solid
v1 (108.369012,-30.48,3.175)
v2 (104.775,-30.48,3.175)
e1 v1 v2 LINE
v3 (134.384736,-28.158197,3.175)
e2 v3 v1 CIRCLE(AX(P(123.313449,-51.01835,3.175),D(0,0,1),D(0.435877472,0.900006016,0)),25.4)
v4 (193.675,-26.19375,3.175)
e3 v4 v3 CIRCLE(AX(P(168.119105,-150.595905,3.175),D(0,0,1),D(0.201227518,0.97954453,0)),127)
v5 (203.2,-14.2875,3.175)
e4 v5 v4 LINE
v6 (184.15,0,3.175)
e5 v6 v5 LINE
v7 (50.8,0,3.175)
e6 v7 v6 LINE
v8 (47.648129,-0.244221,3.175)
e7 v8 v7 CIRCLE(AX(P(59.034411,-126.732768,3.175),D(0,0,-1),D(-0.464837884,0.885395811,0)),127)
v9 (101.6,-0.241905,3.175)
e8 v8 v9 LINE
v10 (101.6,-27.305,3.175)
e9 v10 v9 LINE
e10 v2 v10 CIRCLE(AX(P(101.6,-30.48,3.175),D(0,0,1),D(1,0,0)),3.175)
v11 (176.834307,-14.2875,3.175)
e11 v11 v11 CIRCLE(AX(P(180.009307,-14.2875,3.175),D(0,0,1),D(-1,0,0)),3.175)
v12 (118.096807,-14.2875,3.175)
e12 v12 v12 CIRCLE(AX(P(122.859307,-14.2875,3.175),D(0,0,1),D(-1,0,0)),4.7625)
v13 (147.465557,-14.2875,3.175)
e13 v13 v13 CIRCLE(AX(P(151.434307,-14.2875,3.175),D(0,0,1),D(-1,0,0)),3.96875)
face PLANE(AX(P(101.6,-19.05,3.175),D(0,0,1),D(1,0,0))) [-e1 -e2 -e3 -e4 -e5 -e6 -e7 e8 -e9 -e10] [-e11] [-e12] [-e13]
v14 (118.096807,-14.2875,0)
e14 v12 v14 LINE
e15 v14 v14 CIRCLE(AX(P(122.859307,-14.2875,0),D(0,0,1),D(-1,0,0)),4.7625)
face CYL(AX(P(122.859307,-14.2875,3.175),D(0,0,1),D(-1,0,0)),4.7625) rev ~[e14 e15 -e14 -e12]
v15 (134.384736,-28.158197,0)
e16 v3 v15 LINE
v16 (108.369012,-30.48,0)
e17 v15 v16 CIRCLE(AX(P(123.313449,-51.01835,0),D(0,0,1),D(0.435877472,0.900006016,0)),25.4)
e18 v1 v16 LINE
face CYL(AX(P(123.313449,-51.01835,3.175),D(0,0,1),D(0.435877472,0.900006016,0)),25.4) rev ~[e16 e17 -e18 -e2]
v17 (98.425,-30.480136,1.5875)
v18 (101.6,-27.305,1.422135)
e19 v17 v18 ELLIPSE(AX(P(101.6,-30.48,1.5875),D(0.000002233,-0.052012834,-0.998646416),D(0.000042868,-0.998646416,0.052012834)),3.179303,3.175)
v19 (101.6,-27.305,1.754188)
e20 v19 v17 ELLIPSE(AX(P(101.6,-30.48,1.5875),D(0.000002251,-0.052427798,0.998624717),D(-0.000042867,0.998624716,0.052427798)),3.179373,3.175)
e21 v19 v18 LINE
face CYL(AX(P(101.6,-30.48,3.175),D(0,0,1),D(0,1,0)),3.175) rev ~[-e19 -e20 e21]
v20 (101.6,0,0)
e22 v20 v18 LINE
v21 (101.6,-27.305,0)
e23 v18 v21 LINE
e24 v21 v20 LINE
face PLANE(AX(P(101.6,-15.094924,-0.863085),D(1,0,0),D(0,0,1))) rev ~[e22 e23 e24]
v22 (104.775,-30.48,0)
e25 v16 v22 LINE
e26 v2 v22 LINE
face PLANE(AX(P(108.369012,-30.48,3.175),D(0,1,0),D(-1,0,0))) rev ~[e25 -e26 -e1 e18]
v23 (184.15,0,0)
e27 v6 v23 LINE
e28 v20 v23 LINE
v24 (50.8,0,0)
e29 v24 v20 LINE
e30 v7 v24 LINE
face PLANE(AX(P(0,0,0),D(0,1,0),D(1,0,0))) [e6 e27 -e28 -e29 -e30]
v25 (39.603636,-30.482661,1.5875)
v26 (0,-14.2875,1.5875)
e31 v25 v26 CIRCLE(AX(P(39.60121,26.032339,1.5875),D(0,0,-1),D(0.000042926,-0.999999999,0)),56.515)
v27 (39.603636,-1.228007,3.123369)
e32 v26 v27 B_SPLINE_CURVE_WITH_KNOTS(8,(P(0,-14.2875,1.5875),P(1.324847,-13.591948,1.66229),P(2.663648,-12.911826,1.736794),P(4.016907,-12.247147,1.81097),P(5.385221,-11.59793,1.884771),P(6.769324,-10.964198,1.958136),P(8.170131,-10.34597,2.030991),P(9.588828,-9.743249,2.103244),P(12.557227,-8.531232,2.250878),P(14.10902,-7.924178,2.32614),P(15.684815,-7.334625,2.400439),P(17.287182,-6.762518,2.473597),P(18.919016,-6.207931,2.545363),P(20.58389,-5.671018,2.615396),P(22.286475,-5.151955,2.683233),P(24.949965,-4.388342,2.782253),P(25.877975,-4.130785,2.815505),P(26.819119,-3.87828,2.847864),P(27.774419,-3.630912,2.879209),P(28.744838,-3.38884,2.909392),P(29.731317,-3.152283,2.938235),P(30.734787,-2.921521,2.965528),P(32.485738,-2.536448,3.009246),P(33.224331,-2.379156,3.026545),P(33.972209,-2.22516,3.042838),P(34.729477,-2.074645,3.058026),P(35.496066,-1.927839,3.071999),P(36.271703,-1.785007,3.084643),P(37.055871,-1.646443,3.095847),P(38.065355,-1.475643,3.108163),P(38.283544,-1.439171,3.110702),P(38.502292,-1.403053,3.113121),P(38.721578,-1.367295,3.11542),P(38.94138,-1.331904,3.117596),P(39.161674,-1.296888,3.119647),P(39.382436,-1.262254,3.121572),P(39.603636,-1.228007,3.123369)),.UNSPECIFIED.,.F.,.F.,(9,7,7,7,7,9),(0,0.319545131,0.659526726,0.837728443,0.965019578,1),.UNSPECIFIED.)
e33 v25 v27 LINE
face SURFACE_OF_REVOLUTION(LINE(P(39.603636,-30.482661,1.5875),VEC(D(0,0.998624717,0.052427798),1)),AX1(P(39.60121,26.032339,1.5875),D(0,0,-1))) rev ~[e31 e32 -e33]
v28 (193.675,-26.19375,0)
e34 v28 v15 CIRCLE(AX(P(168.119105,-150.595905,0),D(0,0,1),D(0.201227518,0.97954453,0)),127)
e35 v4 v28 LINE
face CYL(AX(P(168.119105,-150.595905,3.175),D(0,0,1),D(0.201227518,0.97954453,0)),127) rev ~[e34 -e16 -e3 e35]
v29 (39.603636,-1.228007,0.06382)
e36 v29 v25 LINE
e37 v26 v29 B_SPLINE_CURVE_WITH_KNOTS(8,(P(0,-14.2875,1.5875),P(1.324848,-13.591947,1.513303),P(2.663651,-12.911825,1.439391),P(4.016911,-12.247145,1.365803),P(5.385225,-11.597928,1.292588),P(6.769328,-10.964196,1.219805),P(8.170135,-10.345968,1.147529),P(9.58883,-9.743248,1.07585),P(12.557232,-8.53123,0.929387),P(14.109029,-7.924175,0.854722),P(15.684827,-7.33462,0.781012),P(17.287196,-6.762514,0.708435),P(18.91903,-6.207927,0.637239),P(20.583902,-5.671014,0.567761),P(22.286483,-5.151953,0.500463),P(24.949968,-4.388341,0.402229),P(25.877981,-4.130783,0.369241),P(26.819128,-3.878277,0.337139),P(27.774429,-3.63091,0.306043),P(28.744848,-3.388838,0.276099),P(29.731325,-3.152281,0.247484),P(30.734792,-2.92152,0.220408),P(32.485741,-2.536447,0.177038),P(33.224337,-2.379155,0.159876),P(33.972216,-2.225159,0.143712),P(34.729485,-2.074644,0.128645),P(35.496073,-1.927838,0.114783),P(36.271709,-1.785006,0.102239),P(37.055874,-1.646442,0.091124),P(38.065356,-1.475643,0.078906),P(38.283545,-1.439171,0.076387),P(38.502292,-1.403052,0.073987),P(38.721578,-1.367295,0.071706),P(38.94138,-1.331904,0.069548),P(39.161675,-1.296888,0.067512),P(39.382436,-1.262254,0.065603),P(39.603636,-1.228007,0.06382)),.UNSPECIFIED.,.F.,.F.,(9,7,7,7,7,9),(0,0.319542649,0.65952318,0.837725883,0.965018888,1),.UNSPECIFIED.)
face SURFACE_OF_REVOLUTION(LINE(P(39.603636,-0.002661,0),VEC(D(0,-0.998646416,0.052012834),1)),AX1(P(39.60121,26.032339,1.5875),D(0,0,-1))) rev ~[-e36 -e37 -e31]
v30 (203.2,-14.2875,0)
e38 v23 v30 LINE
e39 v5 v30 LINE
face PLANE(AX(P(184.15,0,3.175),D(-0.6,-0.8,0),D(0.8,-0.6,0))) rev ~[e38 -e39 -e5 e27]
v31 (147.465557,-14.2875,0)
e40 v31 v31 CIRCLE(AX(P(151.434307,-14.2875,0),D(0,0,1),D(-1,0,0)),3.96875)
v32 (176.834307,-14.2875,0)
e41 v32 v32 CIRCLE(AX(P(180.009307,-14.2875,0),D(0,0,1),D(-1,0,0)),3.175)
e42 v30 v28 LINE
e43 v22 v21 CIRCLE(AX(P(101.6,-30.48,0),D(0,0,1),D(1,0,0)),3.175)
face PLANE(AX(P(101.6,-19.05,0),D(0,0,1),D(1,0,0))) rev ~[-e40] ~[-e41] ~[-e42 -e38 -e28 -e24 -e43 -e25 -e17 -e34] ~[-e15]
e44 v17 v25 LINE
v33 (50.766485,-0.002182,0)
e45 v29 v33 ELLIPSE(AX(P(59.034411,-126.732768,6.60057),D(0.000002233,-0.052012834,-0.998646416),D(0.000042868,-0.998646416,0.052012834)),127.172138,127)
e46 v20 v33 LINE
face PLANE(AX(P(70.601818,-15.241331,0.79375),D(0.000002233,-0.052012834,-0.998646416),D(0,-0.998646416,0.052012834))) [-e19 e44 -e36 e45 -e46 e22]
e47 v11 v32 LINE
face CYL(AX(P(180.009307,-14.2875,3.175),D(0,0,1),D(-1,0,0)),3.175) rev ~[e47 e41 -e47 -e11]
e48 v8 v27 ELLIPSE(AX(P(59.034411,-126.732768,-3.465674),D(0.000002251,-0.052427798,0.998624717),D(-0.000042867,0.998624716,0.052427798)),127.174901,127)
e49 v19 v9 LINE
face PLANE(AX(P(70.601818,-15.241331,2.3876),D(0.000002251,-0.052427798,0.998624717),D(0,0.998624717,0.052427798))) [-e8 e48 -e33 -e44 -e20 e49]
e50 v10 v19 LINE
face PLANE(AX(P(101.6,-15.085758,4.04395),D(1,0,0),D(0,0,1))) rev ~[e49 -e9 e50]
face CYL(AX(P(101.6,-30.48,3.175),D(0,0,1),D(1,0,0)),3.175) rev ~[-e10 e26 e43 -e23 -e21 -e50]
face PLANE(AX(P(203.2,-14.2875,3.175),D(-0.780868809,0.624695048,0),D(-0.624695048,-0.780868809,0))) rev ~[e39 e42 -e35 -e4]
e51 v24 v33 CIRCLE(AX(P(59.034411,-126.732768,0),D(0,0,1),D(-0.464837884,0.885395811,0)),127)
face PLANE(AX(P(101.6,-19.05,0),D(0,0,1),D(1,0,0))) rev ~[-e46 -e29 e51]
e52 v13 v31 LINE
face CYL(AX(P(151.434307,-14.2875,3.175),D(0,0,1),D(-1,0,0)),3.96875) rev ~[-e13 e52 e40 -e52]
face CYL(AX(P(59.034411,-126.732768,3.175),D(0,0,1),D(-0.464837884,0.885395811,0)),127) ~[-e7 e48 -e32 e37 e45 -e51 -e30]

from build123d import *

# Parameters (mm, degrees)
F0_W     = 203.2
F0_H     = 38.1
F1_DEPTH = 3.175
F2_W     = 3.175
F2_H     = 4.445
F3_DEPTH = 25.4


# Not quite as in the source:
# - a feature names something its author has since deleted; it is built from what else it names


with BuildPart() as f1:
    # F0 (on Top) → F1 (new body)
    with BuildSketch(Plane.XY):
        with Locations((101.6, -19.05)):
            Rectangle(F0_W, F0_H)
    extrude(amount=F1_DEPTH)

    # F2 (on face) → F3 (cut)
    with BuildSketch(Plane.XY.offset(3.175)):
        with BuildLine():
            Line((0, -9.525), (0, -14.2875))
            ThreePointArc((0, -14.2875), (24.649723028, -4.4760985439), (50.8, 0))
            Line((50.8, 0), (0, 0))
            Line((0, 0), (0, -9.525))
        make_face()
        with Locations((103.1875, -35.8775)):
            Rectangle(F2_W, F2_H)
        with BuildLine():
            ThreePointArc((104.775, -30.48), (103.8450640303, -32.7250640303), (101.6, -33.655))
            Line((101.6, -33.655), (104.775, -33.655))
            Line((104.775, -33.655), (104.775, -30.48))
        make_face()
        with BuildLine():
            Line((104.775, -30.48), (101.6, -30.48))
            Line((101.6, -30.48), (101.6, -33.655))
            ThreePointArc((101.6, -33.655), (103.8450640303, -32.7250640303), (104.775, -30.48))
        make_face()
        with BuildLine():
            Line((101.6, -27.305), (101.6, -30.48))
            Line((101.6, -30.48), (104.775, -30.48))
            ThreePointArc((104.775, -30.48), (103.8450640303, -28.2349359697), (101.6, -27.305))
        make_face()
        with BuildLine():
            Line((98.4250000029, -30.4801362911), (101.6, -30.48))
            Line((101.6, -30.48), (101.6, -27.305))
            ThreePointArc((101.6, -27.305), (99.3548877841, -28.2349841564), (98.4250000029, -30.4801362911))
        make_face()
        with BuildLine():
            Line((101.6, -33.655), (101.6, -30.48))
            Line((101.6, -30.48), (98.4250000029, -30.4801362911))
            ThreePointArc((98.4250000029, -30.4801362911), (99.3549841564, -32.7251122159), (101.6, -33.655))
        make_face()
        with BuildLine():
            ThreePointArc((108.3690122037, -30.48), (106.4969075417, -31.9824905065), (104.775, -33.655))
            Line((104.775, -33.655), (104.775, -38.1))
            Line((104.775, -38.1), (184.15, -38.1))
            Line((184.15, -38.1), (193.675, -26.19375))
            ThreePointArc((193.675, -26.19375), (163.9135585822, -23.6655567526), (134.3847364187, -28.1581971794))
            ThreePointArc((134.3847364187, -28.1581971794), (121.0555708247, -25.7189035938), (108.3690122037, -30.48))
        make_face()
        with BuildLine():
            Line((101.6, -38.1), (101.6, -33.655))
            ThreePointArc((101.6, -33.655), (99.3549841564, -32.7251122159), (98.4250000029, -30.4801362911))
            Line((98.4250000029, -30.4801362911), (39.6036359929, -30.4826612755))
            ThreePointArc((39.6036359929, -30.4826612755), (18.2099329026, -26.2778753266), (0, -14.2875))
            Line((0, -14.2875), (0, -19.05))
            Line((0, -19.05), (0, -38.1))
            Line((0, -38.1), (101.6, -38.1))
        make_face()
        Polygon((203.2, 0), (184.15, 0), (203.2, -14.2875), align=None)
        Polygon((193.675, -26.19375), (184.15, -38.1), (203.2, -38.1), (203.2, -19.05), (203.2, -14.2875), align=None)
        with BuildLine():
            Line((108.3690122037, -30.48), (104.775, -30.48))
            Line((104.775, -30.48), (104.775, -33.655))
            ThreePointArc((104.775, -33.655), (106.4969075417, -31.9824905065), (108.3690122037, -30.48))
        make_face()
        with BuildLine():
            ThreePointArc((127.6218066335, -14.2875), (122.8593066335, -9.525), (118.0968066335, -14.2875))
            Line((118.0968066335, -14.2875), (127.6218066335, -14.2875))
        make_face()
        with BuildLine():
            Line((127.6218066335, -14.2875), (118.0968066335, -14.2875))
            ThreePointArc((118.0968066335, -14.2875), (122.8593066335, -19.05), (127.6218066335, -14.2875))
        make_face()
        with BuildLine():
            Line((176.8343066335, -14.2875), (183.1843066335, -14.2875))
            ThreePointArc((183.1843066335, -14.2875), (180.0093066335, -11.1125), (176.8343066335, -14.2875))
        make_face()
        with BuildLine():
            ThreePointArc((176.8343066335, -14.2875), (180.0093066335, -17.4625), (183.1843066335, -14.2875))
            Line((183.1843066335, -14.2875), (176.8343066335, -14.2875))
        make_face()
        with BuildLine():
            ThreePointArc((155.4030566335, -14.2875), (151.4343066335, -10.31875), (147.4655566335, -14.2875))
            Line((147.4655566335, -14.2875), (155.4030566335, -14.2875))
        make_face()
        with BuildLine():
            Line((155.4030566335, -14.2875), (147.4655566335, -14.2875))
            ThreePointArc((147.4655566335, -14.2875), (151.4343066335, -18.25625), (155.4030566335, -14.2875))
        make_face()
    extrude(amount=-F3_DEPTH, mode=Mode.SUBTRACT)

    # F8: sweep along a path in F5
    with BuildLine(Plane.XY.offset(1.5875)) as f8_path:
        Line((101.6, -30.48), (39.6036359929, -30.4826612755))
        ThreePointArc((39.6036359929, -30.4826612755), (18.2099329026, -26.2778753266), (0, -14.2875))
    # F7 (on offset) → F8 (sweep, cut)
    with BuildSketch(Plane.YZ.offset(101.6)):
        Polygon((-30.48, 3.1877), (-30.48, 1.5875), (-21.4048148322, 3.1877), align=None)
        Polygon((-21.4048148322, 3.1877), (-30.48, 1.5875), (0, 3.1877), align=None)
        Polygon((-21.4768401114, 0), (0, 0), (-30.48, 1.5875), align=None)
        Polygon((-4.1187478461, -3.0607), (-21.4768401114, 0), (-30.48, 0), (-30.48, -3.0607), align=None)
        Polygon((-30.48, 0), (-21.4768401114, 0), (-30.48, 1.5875), align=None)
        Polygon((-30.48, 6.2357), (-30.48, 3.1877), (-21.4048148322, 3.1877), (-4.1187478461, 6.2357), align=None)
    sweep(path=f8_path.line, mode=Mode.SUBTRACT)


solid = f1.part
